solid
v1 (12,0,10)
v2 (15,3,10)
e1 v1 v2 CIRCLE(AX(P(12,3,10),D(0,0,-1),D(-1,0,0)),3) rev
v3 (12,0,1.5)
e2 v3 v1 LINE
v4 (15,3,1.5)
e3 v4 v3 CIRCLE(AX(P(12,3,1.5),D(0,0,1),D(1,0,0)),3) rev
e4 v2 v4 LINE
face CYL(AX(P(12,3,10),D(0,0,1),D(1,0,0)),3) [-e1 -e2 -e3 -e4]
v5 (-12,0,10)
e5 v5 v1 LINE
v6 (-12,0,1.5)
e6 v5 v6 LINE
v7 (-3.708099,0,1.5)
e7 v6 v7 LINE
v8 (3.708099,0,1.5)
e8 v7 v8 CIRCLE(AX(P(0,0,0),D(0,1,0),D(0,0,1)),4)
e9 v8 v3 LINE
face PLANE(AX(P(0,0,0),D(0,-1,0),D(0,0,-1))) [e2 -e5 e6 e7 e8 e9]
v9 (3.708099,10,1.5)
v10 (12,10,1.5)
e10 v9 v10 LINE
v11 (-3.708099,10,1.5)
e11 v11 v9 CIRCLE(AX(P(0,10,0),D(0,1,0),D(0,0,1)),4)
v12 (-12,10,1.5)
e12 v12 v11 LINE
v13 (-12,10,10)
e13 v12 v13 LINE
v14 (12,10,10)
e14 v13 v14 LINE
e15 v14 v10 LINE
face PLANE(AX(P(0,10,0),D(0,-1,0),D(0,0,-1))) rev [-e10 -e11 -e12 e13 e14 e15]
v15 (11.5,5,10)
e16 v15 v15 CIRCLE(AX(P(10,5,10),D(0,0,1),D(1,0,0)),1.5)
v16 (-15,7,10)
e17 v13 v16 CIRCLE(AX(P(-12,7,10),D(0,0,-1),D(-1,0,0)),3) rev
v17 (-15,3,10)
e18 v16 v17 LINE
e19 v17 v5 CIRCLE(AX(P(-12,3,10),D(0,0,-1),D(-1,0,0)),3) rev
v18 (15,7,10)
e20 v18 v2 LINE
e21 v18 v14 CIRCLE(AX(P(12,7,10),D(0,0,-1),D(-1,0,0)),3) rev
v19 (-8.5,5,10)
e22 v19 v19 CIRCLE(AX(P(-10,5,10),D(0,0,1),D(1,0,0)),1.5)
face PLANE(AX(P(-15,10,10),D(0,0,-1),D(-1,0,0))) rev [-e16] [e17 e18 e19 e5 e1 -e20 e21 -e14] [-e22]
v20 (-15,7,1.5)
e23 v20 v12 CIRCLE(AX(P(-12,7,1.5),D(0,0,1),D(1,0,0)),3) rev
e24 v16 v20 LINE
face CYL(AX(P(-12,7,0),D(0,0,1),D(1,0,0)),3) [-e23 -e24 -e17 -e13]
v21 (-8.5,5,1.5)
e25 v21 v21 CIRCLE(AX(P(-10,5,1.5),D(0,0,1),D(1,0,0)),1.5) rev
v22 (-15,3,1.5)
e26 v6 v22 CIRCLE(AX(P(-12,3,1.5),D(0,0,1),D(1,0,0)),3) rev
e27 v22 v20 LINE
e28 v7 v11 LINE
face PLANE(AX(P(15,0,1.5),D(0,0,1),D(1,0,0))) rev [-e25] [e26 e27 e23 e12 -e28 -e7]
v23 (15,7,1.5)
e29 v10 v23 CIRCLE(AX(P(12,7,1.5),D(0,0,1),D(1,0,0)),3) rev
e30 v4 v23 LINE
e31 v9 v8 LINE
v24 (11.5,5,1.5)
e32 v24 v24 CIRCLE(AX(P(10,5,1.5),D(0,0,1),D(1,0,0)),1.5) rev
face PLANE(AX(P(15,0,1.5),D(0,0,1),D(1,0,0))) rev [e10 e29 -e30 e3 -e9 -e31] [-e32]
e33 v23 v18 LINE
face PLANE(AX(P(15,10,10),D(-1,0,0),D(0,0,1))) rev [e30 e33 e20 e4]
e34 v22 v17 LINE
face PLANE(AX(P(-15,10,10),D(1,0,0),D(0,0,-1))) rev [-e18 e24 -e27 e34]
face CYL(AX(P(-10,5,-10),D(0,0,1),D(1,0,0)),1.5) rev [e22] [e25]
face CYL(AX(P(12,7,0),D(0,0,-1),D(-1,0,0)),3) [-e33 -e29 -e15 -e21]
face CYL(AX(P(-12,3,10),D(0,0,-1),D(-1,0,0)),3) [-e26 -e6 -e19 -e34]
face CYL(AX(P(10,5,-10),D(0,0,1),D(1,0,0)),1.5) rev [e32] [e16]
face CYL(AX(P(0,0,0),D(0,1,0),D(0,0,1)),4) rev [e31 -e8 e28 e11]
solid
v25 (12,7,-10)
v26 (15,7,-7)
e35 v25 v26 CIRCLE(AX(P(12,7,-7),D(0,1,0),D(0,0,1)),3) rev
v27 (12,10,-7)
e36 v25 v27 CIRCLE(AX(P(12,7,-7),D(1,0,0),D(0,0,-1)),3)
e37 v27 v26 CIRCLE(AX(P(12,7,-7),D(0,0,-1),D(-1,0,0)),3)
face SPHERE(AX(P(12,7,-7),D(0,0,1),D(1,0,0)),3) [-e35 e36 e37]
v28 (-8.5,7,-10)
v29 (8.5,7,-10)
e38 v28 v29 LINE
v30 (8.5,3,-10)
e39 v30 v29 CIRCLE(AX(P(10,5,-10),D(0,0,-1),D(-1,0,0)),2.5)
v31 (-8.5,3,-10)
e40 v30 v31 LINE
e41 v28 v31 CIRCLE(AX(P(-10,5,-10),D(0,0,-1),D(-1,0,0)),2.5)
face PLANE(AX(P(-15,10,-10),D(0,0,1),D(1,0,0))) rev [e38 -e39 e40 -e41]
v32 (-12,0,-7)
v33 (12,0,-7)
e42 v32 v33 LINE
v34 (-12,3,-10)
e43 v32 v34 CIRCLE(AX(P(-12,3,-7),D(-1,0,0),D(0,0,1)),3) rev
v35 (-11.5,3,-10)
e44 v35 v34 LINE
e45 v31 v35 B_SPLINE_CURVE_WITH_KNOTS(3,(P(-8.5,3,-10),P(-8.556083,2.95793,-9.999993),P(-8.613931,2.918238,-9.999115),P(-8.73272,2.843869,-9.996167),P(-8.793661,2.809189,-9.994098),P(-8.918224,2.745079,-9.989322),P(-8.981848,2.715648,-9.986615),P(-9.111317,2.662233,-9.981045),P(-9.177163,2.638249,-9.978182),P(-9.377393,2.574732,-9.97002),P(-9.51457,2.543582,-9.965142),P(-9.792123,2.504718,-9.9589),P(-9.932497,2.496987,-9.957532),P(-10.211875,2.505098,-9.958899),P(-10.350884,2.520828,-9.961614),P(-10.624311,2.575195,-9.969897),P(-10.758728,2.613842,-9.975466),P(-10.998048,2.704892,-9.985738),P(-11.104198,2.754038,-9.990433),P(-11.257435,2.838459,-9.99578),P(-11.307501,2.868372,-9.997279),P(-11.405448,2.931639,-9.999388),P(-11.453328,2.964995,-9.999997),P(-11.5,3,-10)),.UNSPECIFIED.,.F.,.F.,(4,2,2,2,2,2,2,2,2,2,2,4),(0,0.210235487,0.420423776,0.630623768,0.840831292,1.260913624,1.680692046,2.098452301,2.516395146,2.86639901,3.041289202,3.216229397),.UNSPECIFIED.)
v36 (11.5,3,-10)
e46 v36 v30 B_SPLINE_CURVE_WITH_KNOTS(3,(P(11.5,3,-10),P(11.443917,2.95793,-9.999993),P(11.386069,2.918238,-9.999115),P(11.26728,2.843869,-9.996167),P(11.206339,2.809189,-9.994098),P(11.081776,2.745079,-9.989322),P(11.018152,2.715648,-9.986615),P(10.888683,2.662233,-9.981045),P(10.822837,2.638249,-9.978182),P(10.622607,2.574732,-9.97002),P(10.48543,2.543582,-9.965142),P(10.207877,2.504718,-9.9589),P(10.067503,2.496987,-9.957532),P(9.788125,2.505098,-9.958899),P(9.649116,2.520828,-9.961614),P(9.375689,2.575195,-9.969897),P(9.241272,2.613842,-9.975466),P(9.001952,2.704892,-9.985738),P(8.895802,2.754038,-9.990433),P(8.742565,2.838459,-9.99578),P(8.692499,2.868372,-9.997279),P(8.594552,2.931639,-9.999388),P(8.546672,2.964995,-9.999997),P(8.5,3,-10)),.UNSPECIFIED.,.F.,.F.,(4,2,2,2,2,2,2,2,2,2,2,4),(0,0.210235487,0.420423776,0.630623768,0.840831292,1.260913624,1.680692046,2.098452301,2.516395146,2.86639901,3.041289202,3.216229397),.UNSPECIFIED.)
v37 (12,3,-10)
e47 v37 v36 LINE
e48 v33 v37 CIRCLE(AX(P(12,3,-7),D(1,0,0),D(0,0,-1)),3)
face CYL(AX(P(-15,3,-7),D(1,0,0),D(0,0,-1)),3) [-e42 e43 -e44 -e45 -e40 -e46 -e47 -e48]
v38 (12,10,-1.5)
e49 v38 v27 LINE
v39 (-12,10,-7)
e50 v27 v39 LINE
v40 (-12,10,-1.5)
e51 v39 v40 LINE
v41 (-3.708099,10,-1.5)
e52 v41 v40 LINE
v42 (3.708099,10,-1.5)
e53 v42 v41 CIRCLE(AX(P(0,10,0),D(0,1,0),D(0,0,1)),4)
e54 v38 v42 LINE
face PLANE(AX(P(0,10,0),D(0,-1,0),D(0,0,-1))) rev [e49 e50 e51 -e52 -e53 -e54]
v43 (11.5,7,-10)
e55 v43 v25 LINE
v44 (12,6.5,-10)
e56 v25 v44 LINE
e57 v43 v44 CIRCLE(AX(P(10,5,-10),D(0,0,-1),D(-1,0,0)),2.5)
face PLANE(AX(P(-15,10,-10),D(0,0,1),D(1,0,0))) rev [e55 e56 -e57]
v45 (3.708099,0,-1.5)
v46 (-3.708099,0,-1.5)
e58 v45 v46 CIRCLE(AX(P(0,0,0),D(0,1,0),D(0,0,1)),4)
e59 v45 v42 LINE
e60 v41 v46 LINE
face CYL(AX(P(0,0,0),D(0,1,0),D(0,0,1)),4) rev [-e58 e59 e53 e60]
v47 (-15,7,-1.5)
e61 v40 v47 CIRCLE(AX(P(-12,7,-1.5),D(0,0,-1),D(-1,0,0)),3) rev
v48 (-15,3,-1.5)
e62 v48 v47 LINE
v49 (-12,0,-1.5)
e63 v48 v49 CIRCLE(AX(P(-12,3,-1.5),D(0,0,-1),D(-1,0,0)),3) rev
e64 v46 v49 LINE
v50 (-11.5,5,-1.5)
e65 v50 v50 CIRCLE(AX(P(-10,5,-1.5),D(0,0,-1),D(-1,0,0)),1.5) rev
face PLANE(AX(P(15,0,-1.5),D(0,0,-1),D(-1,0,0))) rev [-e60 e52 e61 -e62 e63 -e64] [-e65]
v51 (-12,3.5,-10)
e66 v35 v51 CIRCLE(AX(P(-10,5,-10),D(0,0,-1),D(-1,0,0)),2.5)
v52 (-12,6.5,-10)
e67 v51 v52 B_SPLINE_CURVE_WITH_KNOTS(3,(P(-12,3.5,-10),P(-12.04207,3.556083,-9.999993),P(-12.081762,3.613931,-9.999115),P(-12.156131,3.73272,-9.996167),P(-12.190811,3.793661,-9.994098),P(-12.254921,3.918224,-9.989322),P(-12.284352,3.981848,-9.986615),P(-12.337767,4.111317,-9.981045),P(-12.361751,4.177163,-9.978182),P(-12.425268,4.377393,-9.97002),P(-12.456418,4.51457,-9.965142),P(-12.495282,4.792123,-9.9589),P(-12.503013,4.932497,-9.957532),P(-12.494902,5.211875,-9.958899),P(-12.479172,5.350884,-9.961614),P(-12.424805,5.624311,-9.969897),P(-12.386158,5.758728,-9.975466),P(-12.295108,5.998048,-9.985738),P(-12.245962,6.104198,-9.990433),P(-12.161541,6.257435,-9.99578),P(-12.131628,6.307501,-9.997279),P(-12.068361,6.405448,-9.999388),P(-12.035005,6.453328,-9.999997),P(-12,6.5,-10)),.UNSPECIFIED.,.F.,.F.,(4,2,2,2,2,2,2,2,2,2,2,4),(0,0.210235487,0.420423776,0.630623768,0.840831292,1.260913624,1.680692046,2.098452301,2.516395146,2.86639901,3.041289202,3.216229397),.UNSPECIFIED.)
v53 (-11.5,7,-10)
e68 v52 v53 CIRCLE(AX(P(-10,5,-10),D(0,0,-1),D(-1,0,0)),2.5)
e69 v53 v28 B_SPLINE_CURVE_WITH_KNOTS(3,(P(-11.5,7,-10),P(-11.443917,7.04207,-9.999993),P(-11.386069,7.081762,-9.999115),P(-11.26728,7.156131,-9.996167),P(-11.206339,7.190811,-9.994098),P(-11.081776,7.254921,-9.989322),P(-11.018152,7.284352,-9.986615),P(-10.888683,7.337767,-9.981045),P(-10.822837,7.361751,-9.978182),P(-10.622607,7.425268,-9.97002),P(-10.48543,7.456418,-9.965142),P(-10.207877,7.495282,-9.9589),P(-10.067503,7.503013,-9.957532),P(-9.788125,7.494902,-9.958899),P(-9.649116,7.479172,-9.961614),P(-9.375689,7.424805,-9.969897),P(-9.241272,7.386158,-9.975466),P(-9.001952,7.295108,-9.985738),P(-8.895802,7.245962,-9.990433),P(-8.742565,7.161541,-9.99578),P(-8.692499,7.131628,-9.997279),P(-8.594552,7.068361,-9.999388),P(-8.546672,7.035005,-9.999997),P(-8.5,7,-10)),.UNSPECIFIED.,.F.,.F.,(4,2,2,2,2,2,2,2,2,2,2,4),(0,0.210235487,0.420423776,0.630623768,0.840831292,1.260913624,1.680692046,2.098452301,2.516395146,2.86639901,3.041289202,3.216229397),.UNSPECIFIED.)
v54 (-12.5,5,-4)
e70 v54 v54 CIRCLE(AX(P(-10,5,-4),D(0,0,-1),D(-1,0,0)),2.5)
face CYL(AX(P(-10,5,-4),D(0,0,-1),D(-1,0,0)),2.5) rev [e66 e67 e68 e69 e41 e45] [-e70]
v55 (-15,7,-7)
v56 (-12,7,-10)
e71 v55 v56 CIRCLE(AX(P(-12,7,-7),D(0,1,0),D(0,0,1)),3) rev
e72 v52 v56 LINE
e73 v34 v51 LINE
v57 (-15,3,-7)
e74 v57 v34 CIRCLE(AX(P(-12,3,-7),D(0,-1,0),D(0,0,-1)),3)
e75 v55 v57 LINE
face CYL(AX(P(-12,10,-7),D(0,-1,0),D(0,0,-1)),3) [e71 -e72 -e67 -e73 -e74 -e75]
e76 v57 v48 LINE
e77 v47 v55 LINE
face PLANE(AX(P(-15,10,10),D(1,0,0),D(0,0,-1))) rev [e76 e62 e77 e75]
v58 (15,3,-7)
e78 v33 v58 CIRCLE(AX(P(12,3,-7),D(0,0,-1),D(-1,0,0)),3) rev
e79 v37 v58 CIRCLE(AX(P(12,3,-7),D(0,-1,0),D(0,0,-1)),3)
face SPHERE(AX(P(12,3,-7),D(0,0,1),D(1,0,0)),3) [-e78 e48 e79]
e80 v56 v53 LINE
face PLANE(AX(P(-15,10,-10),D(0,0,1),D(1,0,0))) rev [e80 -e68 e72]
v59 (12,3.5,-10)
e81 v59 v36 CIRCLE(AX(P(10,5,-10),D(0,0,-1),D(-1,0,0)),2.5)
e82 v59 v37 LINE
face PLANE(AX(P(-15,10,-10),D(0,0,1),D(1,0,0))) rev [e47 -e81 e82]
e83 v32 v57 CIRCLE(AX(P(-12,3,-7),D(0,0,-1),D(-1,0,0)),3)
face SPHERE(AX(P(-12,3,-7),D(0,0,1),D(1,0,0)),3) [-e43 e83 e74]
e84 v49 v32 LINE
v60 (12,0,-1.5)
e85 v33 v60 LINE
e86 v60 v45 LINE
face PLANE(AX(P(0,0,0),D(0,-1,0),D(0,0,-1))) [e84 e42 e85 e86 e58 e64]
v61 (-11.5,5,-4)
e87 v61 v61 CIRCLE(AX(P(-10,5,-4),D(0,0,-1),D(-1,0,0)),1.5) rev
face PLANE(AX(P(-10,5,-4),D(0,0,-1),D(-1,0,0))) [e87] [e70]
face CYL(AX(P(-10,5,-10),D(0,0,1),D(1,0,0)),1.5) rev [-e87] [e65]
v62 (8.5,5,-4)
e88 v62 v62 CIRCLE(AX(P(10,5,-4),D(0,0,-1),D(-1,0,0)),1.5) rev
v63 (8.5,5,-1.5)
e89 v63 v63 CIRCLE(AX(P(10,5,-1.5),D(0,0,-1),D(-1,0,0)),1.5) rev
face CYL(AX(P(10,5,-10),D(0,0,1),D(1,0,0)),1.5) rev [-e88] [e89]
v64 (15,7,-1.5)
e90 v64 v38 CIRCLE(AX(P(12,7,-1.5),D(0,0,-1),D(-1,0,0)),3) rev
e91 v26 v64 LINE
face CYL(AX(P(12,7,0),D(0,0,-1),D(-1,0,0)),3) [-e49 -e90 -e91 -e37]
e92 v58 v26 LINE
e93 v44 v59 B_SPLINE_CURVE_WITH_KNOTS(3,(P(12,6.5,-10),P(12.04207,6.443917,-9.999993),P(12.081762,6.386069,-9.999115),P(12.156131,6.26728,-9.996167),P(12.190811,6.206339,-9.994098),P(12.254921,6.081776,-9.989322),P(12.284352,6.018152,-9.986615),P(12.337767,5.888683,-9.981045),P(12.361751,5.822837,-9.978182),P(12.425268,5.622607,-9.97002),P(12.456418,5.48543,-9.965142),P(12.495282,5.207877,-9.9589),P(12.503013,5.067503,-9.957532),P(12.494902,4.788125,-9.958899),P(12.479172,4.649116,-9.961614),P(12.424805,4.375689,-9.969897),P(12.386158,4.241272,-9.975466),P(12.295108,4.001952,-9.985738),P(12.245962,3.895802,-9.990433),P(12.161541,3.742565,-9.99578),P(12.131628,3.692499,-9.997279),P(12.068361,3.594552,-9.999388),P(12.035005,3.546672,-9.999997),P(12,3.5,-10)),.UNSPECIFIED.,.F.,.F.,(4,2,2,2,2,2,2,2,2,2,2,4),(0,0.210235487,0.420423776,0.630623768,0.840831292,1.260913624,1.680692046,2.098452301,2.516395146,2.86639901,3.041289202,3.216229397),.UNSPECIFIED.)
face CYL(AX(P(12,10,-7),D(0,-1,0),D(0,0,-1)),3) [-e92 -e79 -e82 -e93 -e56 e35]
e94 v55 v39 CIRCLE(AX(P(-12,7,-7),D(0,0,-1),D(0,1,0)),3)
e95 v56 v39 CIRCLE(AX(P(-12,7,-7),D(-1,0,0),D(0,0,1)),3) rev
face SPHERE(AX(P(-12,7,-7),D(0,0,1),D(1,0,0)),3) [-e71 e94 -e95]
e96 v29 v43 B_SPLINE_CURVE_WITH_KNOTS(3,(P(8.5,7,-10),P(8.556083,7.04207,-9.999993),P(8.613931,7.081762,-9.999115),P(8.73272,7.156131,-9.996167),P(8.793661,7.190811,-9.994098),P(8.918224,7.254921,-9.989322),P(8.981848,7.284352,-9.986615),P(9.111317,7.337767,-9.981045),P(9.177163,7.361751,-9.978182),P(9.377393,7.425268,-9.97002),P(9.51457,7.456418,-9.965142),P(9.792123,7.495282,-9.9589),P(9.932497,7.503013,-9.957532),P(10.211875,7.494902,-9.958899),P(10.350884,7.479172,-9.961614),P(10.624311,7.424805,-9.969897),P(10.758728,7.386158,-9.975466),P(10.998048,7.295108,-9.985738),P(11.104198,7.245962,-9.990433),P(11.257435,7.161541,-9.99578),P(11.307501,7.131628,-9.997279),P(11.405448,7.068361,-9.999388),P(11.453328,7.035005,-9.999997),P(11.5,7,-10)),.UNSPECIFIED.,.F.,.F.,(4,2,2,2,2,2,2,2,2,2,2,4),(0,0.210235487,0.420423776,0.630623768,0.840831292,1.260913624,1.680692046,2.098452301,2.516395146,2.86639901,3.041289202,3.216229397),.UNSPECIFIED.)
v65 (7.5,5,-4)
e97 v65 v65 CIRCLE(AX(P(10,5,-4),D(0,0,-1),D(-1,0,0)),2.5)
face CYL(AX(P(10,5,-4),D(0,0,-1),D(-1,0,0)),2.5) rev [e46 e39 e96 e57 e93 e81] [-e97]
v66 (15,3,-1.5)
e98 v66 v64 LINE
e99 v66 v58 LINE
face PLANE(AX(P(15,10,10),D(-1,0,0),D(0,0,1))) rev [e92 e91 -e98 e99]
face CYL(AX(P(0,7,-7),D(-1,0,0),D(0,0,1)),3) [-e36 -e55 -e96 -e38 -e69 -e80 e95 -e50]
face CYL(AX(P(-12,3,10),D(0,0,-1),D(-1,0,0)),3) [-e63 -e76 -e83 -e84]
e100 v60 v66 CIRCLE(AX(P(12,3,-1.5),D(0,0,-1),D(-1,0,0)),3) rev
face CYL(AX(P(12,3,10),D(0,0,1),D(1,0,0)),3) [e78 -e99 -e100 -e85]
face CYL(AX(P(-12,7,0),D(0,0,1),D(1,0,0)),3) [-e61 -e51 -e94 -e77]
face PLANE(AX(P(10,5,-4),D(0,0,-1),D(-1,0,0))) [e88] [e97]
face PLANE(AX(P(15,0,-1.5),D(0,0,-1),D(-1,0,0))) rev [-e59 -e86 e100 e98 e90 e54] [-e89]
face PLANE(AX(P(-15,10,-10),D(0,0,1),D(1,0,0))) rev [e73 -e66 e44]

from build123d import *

# Parameters (mm, degrees)
SKETCH1_W           = 30
SKETCH1_H           = 20
BOSS_EXTRUDE1_DEPTH = 10
SKETCH2_R           = 4
CUT_EXTRUDE1_DEPTH  = 10
SKETCH3_R           = 1.5
CUT_EXTRUDE2_DEPTH  = 27.925824036
SKETCH4_R           = 2.5
CUT_EXTRUDE3_DEPTH  = 6
SKETCH5_W           = 30
SKETCH5_H           = 3
CUT_EXTRUDE4_DEPTH  = 21.615528128
FILLET2_R           = 3
FILLET3_R           = 3


with BuildPart() as part:
    # Sketch1 → Boss-Extrude1 (new body)
    with BuildSketch(Plane(origin=(0, 0, 0), x_dir=(1, 0, 0), z_dir=(0, 1, 0))):
        Rectangle(SKETCH1_W, SKETCH1_H)
    extrude(amount=BOSS_EXTRUDE1_DEPTH)

    # Sketch2 → Cut-Extrude1 (cut)
    with BuildSketch(Plane(origin=(0, 10, 0), x_dir=(1, 0, 0), z_dir=(0, 1, 0))):
        with Locations(Location((0, 0, 0), (0, 0, 270))):
            Circle(SKETCH2_R)
    extrude(amount=-CUT_EXTRUDE1_DEPTH, mode=Mode.SUBTRACT)

    # Sketch3 → Cut-Extrude2 (cut, through all)
    with BuildSketch(Plane.XY.offset(10)):
        with Locations((-10, 5)):
            Circle(SKETCH3_R)
        with Locations((10, 5)):
            Circle(SKETCH3_R)
    extrude(amount=-CUT_EXTRUDE2_DEPTH, mode=Mode.SUBTRACT)

    # Sketch4 → Cut-Extrude3 (cut)
    with BuildSketch(Plane(origin=(0, 0, -10), x_dir=(-1, 0, 0), z_dir=(0, 0, -1))):
        with Locations((-10, 5)):
            Circle(SKETCH4_R)
        with Locations((10, 5)):
            Circle(SKETCH4_R)
    extrude(amount=-CUT_EXTRUDE3_DEPTH, mode=Mode.SUBTRACT)

    # Sketch5 → Cut-Extrude4 (cut, through all)
    with BuildSketch(Plane(origin=(0, 10, 0), x_dir=(1, 0, 0), z_dir=(0, 1, 0))):
        Rectangle(SKETCH5_W, SKETCH5_H)
    extrude(amount=-CUT_EXTRUDE4_DEPTH, mode=Mode.SUBTRACT)


with BuildPart() as cut_extrude4_piece_1:
    # of the separate pieces the step leaves, piece 1, a body of its own (cut_extrude4_pieces)
    add(part.part.solids().sort_by_distance((-15, 0, 10))[0])

    # Fillet3
    fillet3_edges = [cut_extrude4_piece_1.edges().sort_by_distance(p)[0] for p in [
        (15, 10, 5.75),
        (-15, 0, 5.75),
        (-15, 10, 5.75),
        (15, 0, 5.75),
    ]]
    fillet(fillet3_edges, radius=FILLET3_R)


with BuildPart() as cut_extrude4_piece_2:
    # of the separate pieces the step leaves, piece 2, a body of its own (cut_extrude4_pieces)
    add(part.part.solids().sort_by_distance((-15, 0, -10))[0])

    # Fillet2
    # the kernel refuses this fillet: 3 mm, written as the material it takes off along each edge
    with BuildSketch(Plane(origin=(12, 3, -7), x_dir=(1, 0, 0), z_dir=(0, 0, -1))) as fillet2_piece_1_section:
        Polygon((0, 0), (FILLET2_R, 0), (FILLET2_R, FILLET2_R), (0, FILLET2_R), align=None)
    fillet2_piece_1 = extrude(amount=FILLET2_R, mode=Mode.PRIVATE)
    fillet2_piece_1 = fillet2_piece_1 - Plane(origin=(12, 3, -7), x_dir=(-0.7071067811865475, 0.7071067811865475, 0), z_dir=(0, 0, -1)) * Sphere(FILLET2_R, mode=Mode.PRIVATE)
    add(fillet2_piece_1, mode=Mode.SUBTRACT)
    with BuildSketch(Plane(origin=(-12, 3, -7), x_dir=(0, 0, -1), z_dir=(-1, 0, 0))) as fillet2_piece_2_section:
        Polygon((0, 0), (FILLET2_R, 0), (FILLET2_R, FILLET2_R), (0, FILLET2_R), align=None)
    fillet2_piece_2 = extrude(amount=FILLET2_R, mode=Mode.PRIVATE)
    fillet2_piece_2 = fillet2_piece_2 - Plane(origin=(-12, 3, -7), x_dir=(0, 0.7071067811865475, 0.7071067811865475), z_dir=(-1, 0, 0)) * Sphere(FILLET2_R, mode=Mode.PRIVATE)
    add(fillet2_piece_2, mode=Mode.SUBTRACT)
    with BuildSketch(Plane(origin=(-12, 7, -7), x_dir=(0, 0, -1), z_dir=(-1, 0, 0))) as fillet2_piece_3_section:
        Polygon((0, 0), (FILLET2_R, 0), (FILLET2_R, -FILLET2_R), (0, -FILLET2_R), align=None)
    fillet2_piece_3 = extrude(amount=FILLET2_R, mode=Mode.PRIVATE)
    fillet2_piece_3 = fillet2_piece_3 - Plane(origin=(-12, 7, -7), x_dir=(0, -0.7071067811865475, 0.7071067811865475), z_dir=(-1, 0, 0)) * Sphere(FILLET2_R, mode=Mode.PRIVATE)
    add(fillet2_piece_3, mode=Mode.SUBTRACT)
    with BuildSketch(Plane(origin=(12, 7, -7), x_dir=(1, 0, 0), z_dir=(0, 0, -1))) as fillet2_piece_4_section:
        Polygon((0, 0), (FILLET2_R, 0), (FILLET2_R, -FILLET2_R), (0, -FILLET2_R), align=None)
    fillet2_piece_4 = extrude(amount=FILLET2_R, mode=Mode.PRIVATE)
    fillet2_piece_4 = fillet2_piece_4 - Plane(origin=(12, 7, -7), x_dir=(-0.7071067811865475, -0.7071067811865475, 0), z_dir=(0, 0, -1)) * Sphere(FILLET2_R, mode=Mode.PRIVATE)
    add(fillet2_piece_4, mode=Mode.SUBTRACT)
    with BuildSketch(Plane(origin=(15, 0, 6), x_dir=(0, 1, 0), z_dir=(0, 0, -1)), Plane(origin=(-15, 0, -7), x_dir=(0, 1, 0), z_dir=(0, 0, 1))) as fillet2_piece_5:
        with BuildLine():
            CenterArc((FILLET2_R, -FILLET2_R), FILLET2_R, 90, 90)
            Line((0, -FILLET2_R), (0, 0))
            Line((0, 0), (FILLET2_R, 0))
        make_face()
    extrude(amount=13, mode=Mode.SUBTRACT)
    with BuildSketch(Plane(origin=(-15, 3, -10), x_dir=(0, 0, 1), z_dir=(0, 1, 0)), Plane(origin=(15, 3, -10), x_dir=(-1, 0, 0), z_dir=(0, 1, 0))) as fillet2_piece_6:
        with BuildLine():
            CenterArc((FILLET2_R, FILLET2_R), FILLET2_R, 180, 90)
            Line((0, FILLET2_R), (0, 0))
            Line((0, 0), (FILLET2_R, 0))
        make_face()
    extrude(amount=4, mode=Mode.SUBTRACT)
    with BuildSketch(Plane(origin=(-15, 10, -7), x_dir=(0, -1, 0), z_dir=(0, 0, 1)), Plane(origin=(15, 10, 6), x_dir=(0, -1, 0), z_dir=(0, 0, -1))) as fillet2_piece_7:
        with BuildLine():
            CenterArc((FILLET2_R, FILLET2_R), FILLET2_R, 180, 90)
            Line((0, FILLET2_R), (0, 0))
            Line((0, 0), (FILLET2_R, 0))
        make_face()
    extrude(amount=13, mode=Mode.SUBTRACT)
    with BuildSketch(Plane(origin=(12, 10, -10), x_dir=(0, -1, 0), z_dir=(-1, 0, 0))) as fillet2_piece_8:
        with BuildLine():
            CenterArc((FILLET2_R, FILLET2_R), FILLET2_R, 180, 90)
            Line((0, FILLET2_R), (0, 0))
            Line((0, 0), (FILLET2_R, 0))
        make_face()
    extrude(amount=24, mode=Mode.SUBTRACT)
    with BuildSketch(Plane(origin=(12, 0, -10), x_dir=(0, 1, 0), z_dir=(-1, 0, 0))) as fillet2_piece_9:
        with BuildLine():
            CenterArc((FILLET2_R, -FILLET2_R), FILLET2_R, 90, 90)
            Line((0, -FILLET2_R), (0, 0))
            Line((0, 0), (FILLET2_R, 0))
        make_face()
    extrude(amount=24, mode=Mode.SUBTRACT)


solid = Compound([cut_extrude4_piece_1.part, cut_extrude4_piece_2.part])
